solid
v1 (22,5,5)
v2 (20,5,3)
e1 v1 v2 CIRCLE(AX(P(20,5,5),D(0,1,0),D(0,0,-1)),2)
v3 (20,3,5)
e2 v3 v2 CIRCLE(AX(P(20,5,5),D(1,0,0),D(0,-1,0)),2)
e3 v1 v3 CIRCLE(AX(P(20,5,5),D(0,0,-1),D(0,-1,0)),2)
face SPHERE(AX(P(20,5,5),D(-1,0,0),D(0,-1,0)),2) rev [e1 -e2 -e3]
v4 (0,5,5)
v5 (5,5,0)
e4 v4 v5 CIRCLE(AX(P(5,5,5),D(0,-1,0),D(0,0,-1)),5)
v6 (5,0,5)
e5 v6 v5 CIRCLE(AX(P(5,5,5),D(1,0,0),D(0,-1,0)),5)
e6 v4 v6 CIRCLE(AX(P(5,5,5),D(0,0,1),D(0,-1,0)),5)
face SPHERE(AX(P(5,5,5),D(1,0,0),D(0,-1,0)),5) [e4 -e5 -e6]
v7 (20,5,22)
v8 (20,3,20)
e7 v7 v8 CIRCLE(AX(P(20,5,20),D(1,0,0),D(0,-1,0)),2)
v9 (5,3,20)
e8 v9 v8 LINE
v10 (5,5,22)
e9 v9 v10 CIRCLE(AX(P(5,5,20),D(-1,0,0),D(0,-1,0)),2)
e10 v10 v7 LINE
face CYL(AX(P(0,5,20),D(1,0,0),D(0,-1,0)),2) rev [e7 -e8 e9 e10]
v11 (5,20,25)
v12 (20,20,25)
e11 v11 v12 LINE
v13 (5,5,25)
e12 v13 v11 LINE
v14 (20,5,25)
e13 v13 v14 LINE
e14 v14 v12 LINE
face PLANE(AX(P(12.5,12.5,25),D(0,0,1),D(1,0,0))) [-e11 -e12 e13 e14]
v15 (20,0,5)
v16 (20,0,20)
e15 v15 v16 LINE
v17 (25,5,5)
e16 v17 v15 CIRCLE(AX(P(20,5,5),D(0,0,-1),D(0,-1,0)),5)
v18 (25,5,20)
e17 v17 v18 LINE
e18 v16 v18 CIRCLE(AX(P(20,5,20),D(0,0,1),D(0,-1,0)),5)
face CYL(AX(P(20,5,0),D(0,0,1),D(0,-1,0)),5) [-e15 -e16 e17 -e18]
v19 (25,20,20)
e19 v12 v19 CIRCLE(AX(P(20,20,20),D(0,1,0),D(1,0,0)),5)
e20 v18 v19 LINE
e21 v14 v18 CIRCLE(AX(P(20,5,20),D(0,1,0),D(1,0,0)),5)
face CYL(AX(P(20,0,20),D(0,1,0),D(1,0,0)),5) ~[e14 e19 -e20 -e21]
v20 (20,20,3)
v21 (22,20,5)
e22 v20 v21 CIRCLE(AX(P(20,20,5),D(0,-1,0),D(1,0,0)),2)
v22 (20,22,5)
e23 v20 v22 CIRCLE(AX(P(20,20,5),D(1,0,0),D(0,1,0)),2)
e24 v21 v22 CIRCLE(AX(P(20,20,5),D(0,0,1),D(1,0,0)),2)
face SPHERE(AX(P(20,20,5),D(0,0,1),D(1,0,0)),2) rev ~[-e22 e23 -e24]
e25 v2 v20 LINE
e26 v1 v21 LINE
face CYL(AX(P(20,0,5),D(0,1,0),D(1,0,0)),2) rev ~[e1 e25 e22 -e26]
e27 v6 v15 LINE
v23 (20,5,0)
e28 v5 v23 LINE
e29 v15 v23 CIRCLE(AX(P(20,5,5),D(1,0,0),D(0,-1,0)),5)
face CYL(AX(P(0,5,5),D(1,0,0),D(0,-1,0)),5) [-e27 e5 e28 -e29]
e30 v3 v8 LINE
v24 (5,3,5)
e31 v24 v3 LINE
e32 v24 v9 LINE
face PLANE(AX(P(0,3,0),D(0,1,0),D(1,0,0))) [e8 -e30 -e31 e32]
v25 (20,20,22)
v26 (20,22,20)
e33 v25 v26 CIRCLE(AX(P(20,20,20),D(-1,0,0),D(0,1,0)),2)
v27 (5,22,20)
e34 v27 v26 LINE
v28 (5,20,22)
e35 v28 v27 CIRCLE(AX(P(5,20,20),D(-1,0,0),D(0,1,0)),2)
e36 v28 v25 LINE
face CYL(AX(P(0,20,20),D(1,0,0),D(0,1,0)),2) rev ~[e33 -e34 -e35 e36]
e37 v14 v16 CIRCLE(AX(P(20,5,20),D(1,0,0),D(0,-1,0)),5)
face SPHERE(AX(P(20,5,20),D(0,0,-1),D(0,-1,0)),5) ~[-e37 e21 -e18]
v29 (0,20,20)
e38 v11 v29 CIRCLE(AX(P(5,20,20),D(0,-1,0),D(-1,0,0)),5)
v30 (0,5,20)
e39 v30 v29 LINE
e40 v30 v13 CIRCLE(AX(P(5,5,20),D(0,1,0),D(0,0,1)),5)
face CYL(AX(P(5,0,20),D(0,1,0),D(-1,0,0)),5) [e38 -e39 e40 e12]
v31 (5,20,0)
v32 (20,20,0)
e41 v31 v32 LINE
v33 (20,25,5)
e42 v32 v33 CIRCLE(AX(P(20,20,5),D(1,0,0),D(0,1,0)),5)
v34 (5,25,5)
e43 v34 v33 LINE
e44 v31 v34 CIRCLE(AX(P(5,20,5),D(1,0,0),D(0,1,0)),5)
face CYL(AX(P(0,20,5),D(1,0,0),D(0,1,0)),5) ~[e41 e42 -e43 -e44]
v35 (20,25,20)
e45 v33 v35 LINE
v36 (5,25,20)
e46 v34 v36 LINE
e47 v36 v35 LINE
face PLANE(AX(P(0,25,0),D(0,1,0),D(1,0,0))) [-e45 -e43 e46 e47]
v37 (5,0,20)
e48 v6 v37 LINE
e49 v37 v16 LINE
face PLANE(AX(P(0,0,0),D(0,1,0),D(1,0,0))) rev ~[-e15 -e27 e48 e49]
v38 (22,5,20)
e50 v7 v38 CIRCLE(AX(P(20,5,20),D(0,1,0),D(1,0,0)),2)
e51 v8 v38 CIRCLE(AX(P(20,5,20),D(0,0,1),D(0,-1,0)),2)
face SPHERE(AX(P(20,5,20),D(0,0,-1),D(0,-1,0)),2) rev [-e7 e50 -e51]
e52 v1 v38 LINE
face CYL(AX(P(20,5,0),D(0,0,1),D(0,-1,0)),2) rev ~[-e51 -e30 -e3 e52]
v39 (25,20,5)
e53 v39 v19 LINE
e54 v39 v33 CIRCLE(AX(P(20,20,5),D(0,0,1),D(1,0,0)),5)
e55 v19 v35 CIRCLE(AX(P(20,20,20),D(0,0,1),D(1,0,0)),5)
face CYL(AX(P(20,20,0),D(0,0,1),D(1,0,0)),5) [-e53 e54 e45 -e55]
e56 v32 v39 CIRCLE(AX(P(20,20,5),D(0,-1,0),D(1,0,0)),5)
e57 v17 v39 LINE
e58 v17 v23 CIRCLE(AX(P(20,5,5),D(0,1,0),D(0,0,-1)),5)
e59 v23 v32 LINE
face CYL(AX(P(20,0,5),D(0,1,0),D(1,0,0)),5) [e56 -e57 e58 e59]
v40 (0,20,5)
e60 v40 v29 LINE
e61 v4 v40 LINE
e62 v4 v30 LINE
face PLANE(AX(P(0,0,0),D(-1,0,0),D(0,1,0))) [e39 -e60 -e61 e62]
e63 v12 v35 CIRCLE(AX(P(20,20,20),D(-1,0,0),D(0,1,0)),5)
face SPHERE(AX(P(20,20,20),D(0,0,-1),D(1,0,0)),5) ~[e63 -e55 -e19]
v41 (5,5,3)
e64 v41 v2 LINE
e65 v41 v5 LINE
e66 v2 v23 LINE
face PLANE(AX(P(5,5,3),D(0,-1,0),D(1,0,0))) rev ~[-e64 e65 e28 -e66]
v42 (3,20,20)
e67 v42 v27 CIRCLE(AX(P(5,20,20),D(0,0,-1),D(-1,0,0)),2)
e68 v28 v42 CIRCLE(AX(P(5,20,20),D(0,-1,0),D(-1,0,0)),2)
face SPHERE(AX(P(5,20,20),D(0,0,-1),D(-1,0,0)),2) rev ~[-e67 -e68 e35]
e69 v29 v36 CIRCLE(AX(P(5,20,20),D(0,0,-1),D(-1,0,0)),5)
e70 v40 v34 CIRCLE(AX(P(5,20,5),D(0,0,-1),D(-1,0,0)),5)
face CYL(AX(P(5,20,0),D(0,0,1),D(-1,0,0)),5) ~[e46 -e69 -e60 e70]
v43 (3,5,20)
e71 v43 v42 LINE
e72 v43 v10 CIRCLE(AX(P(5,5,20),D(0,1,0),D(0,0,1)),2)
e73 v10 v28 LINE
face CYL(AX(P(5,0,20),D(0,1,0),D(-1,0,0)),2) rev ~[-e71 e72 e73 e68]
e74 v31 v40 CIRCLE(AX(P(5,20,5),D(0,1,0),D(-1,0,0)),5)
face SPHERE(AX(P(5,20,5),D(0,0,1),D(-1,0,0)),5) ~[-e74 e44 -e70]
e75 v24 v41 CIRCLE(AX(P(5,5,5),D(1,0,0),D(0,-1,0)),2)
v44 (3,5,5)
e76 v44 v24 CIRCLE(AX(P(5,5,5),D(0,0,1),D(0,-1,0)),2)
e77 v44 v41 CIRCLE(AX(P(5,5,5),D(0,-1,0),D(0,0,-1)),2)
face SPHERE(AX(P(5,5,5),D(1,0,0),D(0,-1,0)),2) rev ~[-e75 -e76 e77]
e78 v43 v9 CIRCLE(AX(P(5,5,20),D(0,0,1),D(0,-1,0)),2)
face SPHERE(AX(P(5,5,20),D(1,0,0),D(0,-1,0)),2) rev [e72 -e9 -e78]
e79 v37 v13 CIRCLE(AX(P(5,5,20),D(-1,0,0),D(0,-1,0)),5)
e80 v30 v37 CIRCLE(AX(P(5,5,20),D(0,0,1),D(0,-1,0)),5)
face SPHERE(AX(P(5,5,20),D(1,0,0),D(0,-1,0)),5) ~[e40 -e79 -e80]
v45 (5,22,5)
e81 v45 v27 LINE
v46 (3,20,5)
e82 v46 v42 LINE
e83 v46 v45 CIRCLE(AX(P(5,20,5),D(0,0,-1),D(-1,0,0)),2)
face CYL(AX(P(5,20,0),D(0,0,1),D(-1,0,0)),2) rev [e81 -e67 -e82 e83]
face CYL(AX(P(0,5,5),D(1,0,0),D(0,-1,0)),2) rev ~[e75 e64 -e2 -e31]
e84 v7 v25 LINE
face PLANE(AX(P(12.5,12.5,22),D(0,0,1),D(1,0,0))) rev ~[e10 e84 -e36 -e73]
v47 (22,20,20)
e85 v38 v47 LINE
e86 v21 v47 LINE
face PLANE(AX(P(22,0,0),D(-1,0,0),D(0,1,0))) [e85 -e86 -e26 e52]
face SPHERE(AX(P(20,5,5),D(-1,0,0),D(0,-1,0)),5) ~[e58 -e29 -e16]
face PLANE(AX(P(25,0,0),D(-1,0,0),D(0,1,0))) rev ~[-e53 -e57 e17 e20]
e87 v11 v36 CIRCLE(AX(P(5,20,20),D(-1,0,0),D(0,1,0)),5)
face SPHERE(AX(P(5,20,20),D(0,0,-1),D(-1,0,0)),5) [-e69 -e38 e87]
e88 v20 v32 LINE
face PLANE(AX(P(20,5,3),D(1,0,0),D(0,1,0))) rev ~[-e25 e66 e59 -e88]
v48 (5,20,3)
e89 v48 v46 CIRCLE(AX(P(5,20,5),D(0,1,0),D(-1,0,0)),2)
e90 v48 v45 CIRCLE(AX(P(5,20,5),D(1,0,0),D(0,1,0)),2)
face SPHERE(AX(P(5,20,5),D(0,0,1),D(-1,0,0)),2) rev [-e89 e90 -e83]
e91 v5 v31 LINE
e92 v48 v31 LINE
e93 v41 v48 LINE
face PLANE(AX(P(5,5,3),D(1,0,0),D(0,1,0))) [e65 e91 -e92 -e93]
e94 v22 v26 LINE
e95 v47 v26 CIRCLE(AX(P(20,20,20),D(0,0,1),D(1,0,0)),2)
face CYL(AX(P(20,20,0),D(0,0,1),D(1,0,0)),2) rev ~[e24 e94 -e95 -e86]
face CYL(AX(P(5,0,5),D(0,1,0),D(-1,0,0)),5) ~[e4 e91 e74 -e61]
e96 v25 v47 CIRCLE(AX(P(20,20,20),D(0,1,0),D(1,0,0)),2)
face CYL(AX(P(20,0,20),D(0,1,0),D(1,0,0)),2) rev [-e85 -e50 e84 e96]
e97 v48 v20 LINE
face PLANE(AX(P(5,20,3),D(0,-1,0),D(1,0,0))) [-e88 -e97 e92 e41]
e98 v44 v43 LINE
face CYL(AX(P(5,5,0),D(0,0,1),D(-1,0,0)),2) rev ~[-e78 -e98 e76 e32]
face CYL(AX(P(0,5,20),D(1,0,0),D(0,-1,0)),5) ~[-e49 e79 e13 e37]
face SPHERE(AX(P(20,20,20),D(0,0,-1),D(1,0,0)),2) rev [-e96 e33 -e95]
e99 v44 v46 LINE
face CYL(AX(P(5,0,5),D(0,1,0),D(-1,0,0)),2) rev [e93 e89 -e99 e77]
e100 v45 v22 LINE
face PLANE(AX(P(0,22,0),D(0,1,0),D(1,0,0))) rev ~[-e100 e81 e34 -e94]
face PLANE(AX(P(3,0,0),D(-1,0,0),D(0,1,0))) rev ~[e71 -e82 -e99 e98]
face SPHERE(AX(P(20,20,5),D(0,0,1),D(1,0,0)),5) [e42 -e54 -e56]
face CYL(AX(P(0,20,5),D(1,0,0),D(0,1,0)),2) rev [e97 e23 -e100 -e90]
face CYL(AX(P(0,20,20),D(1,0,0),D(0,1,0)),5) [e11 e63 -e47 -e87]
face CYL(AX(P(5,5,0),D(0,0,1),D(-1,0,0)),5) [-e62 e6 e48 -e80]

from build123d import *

# Parameters (mm, degrees)
F0_W     = 25
F0_H     = 25
F1_DEPTH = 25
F2_R     = 5
F3_T     = -3


# Not quite as in the source:
# - a shell that OpenCascade refuses in one call is made with other operations: the cavity is built on its own and cut out


with BuildPart() as f1:
    # F0 (on Top) → F1 (new body)
    with BuildSketch(Plane.XY):
        with Locations((12.5, 12.5)):
            Rectangle(F0_W, F0_H)
    extrude(amount=F1_DEPTH)

    # F2
    f2_edges = [f1.edges().sort_by_distance(p)[0] for p in [
        (12.5, 0, 0),
        (25, 0, 12.5),
        (12.5, 0, 25),
        (25, 25, 12.5),
        (25, 12.5, 0),
        (25, 12.5, 25),
        (0, 25, 12.5),
        (0, 0, 12.5),
        (0, 12.5, 0),
        (0, 12.5, 25),
        (12.5, 25, 0),
        (12.5, 25, 25),
    ]]
    fillet(f2_edges, radius=F2_R)

    # F3: a shell. OpenCascade refuses it in one call, so the cavity is built on its own and cut out:
    # the body offset inwards by the wall thickness, plus a prism from it out through each open face.
    f3_core = offset(f1.part, amount=F3_T, mode=Mode.PRIVATE)
    f3_exits = [f3_core.faces().sort_by_distance(p)[0] for p in [
        (12.5, 12.5, 3),
    ]]
    add(f3_core, mode=Mode.SUBTRACT)
    extrude(f3_exits, amount=-F3_T, mode=Mode.SUBTRACT)


solid = f1.part
